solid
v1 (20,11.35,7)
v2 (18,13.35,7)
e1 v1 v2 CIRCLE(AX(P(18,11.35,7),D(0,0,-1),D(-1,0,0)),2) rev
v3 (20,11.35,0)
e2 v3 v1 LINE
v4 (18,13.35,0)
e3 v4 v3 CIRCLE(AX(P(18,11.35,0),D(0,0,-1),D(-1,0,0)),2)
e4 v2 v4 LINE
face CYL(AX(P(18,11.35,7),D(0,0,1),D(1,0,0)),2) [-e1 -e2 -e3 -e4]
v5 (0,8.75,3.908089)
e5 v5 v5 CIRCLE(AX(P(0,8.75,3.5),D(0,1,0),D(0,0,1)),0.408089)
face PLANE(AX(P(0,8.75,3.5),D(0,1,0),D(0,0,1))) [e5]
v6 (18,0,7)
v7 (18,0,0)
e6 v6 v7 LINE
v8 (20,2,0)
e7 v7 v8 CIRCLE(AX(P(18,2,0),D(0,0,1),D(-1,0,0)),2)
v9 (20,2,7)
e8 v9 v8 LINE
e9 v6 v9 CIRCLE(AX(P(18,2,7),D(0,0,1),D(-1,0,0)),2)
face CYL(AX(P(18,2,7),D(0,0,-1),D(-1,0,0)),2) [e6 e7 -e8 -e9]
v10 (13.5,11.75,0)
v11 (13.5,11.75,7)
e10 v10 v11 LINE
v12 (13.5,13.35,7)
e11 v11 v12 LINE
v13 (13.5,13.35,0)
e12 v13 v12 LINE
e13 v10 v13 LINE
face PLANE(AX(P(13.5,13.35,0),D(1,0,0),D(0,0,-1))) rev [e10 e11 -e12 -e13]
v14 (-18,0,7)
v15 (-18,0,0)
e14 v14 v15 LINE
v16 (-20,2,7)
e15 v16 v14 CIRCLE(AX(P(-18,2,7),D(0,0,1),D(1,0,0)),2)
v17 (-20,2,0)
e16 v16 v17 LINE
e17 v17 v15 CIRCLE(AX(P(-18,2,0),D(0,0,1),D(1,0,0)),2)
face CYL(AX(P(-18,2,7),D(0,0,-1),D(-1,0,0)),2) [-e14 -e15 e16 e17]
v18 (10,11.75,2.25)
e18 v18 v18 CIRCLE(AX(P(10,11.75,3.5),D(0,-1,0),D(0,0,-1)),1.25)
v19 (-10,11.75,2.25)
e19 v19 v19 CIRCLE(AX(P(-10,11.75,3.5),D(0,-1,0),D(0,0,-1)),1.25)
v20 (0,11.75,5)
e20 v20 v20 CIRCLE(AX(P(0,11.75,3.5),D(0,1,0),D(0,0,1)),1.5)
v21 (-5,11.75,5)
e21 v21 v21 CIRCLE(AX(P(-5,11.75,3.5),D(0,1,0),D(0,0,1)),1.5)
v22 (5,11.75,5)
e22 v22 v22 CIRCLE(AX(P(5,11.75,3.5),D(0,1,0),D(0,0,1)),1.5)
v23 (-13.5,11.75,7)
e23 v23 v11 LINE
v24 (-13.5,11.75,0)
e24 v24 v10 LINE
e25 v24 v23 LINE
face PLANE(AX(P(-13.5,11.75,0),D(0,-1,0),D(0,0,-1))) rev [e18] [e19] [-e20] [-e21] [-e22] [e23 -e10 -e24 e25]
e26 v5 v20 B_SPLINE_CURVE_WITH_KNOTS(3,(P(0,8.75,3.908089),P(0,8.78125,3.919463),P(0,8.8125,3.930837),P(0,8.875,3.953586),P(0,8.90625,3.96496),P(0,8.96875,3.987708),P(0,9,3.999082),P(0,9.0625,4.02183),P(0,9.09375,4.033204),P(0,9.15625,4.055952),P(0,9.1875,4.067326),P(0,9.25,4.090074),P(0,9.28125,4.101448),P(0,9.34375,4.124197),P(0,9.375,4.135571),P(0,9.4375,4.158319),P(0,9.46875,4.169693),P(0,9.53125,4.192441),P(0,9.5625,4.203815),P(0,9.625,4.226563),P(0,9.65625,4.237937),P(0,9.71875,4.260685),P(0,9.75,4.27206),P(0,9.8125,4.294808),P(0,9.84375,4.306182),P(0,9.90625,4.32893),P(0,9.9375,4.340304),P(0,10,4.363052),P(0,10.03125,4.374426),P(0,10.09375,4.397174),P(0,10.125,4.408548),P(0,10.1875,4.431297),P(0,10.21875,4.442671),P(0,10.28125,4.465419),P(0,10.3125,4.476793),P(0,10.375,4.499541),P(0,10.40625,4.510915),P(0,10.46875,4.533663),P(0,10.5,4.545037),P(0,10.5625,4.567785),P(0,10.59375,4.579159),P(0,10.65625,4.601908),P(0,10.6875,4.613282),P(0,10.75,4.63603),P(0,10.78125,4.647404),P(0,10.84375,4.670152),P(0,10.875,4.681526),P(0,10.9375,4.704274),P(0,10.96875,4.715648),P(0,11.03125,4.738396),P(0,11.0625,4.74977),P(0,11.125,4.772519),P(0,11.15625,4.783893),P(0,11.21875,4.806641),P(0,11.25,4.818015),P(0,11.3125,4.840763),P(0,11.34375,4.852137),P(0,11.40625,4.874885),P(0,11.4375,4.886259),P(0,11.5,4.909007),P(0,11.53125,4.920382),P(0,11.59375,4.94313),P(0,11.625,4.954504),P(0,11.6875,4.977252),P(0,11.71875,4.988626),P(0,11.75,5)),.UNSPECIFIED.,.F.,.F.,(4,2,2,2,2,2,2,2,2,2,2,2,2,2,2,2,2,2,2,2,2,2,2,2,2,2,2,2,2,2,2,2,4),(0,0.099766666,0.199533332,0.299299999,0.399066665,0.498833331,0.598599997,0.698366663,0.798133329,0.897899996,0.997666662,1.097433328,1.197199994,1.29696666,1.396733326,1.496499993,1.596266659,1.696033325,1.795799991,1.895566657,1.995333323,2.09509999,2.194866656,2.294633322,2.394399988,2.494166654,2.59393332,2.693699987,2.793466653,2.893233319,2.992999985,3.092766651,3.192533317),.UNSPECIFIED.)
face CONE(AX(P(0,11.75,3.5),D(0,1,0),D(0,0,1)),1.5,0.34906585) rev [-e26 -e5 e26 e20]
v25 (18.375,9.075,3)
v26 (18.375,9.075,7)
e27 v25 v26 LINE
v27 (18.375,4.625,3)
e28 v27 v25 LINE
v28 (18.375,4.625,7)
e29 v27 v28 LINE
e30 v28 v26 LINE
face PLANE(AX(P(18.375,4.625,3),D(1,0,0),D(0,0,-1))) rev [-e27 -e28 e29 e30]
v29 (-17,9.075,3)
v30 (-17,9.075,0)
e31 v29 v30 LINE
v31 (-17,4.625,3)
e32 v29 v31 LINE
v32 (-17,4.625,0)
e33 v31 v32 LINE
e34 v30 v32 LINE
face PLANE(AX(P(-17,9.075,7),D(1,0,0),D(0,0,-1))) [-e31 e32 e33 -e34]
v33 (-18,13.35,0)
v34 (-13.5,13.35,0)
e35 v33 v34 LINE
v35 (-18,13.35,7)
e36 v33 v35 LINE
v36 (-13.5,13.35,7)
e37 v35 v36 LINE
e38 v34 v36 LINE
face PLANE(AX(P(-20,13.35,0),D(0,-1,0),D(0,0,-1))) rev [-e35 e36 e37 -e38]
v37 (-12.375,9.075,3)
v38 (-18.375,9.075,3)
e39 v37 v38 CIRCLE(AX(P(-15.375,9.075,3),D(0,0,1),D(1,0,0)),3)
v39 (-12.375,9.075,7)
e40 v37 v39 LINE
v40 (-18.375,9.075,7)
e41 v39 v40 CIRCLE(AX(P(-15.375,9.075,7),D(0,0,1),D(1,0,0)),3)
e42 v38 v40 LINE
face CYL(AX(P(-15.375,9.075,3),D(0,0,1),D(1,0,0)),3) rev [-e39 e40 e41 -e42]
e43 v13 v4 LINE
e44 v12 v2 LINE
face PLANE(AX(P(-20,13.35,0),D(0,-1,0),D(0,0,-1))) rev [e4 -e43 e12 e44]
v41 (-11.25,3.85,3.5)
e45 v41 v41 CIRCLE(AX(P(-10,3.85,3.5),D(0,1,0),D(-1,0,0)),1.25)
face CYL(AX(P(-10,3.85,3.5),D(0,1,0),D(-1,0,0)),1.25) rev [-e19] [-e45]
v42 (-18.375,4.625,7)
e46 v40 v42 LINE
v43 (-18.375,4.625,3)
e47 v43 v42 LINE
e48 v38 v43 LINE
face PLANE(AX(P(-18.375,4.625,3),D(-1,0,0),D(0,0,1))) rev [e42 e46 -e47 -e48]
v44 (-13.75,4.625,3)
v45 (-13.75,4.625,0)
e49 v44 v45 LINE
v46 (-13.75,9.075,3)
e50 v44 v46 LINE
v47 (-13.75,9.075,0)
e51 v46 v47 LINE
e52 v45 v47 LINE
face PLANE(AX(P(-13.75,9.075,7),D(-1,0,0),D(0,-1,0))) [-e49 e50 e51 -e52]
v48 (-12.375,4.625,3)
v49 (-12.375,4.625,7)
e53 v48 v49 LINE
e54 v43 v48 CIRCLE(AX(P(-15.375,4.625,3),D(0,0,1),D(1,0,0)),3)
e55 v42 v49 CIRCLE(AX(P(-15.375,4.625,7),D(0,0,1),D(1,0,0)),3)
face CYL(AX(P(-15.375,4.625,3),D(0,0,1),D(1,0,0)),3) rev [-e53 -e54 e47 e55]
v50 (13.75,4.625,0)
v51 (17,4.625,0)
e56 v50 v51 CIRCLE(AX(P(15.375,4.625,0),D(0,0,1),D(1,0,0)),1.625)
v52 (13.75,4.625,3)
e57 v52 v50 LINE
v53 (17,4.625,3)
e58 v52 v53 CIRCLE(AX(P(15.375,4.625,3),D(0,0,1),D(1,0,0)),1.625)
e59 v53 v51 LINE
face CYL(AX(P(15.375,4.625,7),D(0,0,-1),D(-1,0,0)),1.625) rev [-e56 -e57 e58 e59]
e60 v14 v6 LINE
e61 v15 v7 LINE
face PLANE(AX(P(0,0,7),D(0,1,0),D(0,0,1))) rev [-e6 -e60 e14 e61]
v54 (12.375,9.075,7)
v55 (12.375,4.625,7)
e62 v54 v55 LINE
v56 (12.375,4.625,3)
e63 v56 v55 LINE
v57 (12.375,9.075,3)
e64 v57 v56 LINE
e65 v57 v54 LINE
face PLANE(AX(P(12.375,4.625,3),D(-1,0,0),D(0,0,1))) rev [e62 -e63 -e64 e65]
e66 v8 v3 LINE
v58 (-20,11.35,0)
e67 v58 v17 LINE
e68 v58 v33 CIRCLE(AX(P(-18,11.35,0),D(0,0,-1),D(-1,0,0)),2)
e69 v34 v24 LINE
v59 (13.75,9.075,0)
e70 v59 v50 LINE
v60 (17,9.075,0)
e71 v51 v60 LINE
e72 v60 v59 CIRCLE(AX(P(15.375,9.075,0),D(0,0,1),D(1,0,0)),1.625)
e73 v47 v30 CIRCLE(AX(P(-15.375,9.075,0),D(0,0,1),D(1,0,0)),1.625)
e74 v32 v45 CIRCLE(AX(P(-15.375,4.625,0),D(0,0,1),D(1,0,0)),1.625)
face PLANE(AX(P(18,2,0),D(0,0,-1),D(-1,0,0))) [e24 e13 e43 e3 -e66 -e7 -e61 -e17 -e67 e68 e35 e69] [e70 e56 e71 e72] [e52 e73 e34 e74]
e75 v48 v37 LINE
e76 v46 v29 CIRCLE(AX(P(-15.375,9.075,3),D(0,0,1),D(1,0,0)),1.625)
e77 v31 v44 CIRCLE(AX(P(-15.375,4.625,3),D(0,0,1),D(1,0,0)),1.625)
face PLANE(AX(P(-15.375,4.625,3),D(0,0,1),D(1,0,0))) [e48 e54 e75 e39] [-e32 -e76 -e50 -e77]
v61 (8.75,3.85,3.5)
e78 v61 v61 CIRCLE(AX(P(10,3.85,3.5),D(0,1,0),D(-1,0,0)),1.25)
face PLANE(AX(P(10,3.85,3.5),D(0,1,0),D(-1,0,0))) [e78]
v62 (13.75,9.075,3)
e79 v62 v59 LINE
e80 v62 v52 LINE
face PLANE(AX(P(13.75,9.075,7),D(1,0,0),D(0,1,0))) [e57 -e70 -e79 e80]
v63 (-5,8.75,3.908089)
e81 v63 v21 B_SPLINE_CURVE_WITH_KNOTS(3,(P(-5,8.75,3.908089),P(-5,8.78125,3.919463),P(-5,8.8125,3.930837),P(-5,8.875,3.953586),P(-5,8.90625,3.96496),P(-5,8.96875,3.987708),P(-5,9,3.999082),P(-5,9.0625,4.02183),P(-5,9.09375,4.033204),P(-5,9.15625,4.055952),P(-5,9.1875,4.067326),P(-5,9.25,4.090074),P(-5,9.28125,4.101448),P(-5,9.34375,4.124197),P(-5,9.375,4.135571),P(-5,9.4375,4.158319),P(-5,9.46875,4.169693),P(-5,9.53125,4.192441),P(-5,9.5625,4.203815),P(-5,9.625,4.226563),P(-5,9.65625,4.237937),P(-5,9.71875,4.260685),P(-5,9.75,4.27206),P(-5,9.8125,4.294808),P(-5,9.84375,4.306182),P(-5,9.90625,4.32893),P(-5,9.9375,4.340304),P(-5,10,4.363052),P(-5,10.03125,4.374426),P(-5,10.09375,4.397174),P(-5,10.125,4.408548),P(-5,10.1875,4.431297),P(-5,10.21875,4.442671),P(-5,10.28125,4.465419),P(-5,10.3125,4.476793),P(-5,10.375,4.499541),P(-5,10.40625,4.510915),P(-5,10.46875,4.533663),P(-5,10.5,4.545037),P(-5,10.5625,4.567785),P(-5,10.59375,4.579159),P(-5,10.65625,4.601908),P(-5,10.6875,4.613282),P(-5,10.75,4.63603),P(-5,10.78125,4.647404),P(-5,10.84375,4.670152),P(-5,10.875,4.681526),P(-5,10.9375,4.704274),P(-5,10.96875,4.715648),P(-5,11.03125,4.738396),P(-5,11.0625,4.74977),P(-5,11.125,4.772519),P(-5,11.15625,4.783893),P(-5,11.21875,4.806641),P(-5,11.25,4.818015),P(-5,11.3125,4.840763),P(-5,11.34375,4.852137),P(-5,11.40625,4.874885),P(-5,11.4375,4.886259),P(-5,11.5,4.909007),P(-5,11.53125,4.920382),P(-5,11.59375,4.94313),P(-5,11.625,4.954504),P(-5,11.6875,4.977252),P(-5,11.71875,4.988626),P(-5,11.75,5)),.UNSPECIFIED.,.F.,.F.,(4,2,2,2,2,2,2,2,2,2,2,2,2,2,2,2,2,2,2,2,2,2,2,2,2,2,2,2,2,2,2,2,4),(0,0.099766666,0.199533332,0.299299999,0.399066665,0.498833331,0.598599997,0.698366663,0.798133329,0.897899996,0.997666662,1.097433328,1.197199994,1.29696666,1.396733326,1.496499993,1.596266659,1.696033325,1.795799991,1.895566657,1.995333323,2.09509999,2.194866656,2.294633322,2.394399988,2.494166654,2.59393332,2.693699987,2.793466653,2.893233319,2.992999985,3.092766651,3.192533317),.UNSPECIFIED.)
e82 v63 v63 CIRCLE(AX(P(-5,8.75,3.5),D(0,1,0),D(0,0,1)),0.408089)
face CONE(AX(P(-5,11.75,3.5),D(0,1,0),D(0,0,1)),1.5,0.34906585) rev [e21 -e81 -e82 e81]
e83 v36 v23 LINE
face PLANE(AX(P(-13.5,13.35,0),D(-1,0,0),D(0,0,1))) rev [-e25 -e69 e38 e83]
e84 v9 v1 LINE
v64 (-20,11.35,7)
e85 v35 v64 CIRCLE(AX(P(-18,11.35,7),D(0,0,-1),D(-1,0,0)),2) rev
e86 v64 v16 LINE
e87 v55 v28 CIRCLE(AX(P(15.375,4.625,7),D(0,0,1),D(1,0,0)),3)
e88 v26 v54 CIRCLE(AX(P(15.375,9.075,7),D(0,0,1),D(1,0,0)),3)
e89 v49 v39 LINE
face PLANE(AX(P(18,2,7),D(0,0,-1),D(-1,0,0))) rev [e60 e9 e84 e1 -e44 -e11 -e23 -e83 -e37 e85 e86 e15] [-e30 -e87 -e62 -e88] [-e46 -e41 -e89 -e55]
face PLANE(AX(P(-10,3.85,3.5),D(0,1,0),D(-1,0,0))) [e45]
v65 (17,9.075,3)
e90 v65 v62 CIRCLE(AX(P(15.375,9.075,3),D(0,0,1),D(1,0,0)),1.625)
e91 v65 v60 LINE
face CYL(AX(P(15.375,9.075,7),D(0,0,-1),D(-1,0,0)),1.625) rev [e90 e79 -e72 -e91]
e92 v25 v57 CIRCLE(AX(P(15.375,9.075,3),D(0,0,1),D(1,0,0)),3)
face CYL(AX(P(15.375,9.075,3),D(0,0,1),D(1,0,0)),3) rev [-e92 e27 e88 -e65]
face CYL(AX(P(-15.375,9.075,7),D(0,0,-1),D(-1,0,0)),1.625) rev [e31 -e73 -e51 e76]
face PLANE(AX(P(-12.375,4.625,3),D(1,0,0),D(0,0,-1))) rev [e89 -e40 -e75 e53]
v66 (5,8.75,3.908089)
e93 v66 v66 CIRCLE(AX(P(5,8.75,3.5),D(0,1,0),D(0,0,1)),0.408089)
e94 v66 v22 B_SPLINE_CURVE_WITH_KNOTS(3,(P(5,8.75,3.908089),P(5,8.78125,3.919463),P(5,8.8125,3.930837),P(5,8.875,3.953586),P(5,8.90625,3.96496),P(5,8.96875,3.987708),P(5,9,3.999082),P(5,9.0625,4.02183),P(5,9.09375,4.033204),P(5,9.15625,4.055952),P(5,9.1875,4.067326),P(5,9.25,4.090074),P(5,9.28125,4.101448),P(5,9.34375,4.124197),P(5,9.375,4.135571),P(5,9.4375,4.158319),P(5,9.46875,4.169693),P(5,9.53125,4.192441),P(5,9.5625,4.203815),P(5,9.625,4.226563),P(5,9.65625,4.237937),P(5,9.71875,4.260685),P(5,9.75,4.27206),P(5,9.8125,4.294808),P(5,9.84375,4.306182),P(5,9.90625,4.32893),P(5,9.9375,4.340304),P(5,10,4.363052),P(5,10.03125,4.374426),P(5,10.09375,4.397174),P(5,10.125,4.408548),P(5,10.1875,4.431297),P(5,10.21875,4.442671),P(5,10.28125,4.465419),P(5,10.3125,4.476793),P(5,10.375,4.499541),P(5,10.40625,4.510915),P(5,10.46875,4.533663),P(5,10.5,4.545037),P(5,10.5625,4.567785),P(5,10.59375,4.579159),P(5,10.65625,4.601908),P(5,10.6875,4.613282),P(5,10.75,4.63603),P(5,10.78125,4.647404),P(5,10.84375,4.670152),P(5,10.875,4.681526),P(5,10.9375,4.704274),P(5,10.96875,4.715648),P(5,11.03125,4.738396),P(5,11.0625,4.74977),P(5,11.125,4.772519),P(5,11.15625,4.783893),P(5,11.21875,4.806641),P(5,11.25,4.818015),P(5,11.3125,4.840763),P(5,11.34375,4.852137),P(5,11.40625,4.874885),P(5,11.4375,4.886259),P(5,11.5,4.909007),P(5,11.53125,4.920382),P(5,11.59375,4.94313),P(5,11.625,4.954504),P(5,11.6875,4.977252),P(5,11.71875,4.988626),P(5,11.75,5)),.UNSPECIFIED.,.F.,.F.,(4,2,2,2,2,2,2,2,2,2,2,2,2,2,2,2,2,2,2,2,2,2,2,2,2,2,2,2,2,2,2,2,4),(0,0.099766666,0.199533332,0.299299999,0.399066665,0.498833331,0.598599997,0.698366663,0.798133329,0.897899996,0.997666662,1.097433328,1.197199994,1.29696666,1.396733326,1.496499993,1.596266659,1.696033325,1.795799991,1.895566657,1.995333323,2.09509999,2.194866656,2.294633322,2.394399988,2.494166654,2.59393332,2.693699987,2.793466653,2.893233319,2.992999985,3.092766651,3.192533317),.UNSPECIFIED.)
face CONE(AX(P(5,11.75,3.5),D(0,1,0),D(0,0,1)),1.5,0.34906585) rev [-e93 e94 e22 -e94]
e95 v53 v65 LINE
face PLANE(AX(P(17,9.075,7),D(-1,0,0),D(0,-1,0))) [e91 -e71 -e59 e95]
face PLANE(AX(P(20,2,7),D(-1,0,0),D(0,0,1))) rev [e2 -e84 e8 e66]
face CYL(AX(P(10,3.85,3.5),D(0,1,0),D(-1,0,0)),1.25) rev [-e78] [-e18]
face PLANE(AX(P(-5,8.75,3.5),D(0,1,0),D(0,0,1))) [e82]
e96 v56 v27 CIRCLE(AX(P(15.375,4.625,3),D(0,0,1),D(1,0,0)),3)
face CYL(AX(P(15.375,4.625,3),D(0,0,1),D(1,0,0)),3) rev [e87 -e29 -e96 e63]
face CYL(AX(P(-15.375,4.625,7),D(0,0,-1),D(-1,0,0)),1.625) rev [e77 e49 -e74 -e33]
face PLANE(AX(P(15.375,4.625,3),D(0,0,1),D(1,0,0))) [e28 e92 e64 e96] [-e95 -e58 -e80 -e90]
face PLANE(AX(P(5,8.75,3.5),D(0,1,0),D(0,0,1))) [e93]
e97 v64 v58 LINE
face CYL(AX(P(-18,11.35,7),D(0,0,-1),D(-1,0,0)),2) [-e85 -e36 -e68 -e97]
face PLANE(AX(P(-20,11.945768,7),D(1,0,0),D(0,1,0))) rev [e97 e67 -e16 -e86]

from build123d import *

# Parameters (mm, degrees)
BOSS_EXTRUDE1_DEPTH            = 7
SCREWHEADCLEARANCE_DEPTH       = 4
PCB_CUTOUT_DEPTH               = 30.03484975
SKETCH8_R                      = 1.25
SCREWTHREADS_DEPTH             = 16
SKETCH9_R                      = 3
CUT_EXTRUDE6_DEPTH             = 8.1
SKETCH10_W                     = 40
SKETCH10_H                     = 6.5
CUT_EXTRUDE7_DEPTH             = 30.034849842
FILLET1_R                      = 2
SKETCH11_R                     = 1.5
CLEARANCEHOLES_DEPTH           = 3
CLEARANCEHOLES_DRAFT           = -20
CLEARANCEHOLES_PROFILE_2_DEPTH = 3
CLEARANCEHOLES_PROFILE_2_DRAFT = -20
CLEARANCEHOLES_PROFILE_3_DEPTH = 3
CLEARANCEHOLES_PROFILE_3_DRAFT = -20


with BuildPart() as part:
    # Sketch1 → Boss-Extrude1 (new body)
    with BuildSketch(Plane.XY):
        with BuildLine():
            Line((0, 0), (18, 0))
            ThreePointArc((18, 0), (19.414213562, 0.585786438), (20, 2))
            Line((20, 2), (20, 11.945768163))
            ThreePointArc((20, 11.945768163), (19.769252649, 12.878369398), (19.130254936, 13.595775369))
            Line((19.130254936, 13.595775369), (10.510938386, 19.500007206))
            ThreePointArc((10.510938386, 19.500007206), (9.972285338, 19.760499203), (9.380683449, 19.85))
            Line((9.380683449, 19.85), (-9.380683449, 19.85))
            ThreePointArc((-9.380683449, 19.85), (-9.972285338, 19.760499203), (-10.510938386, 19.500007206))
            Line((-10.510938386, 19.500007206), (-19.130254936, 13.595775369))
            ThreePointArc((-19.130254936, 13.595775369), (-19.769252649, 12.878369398), (-20, 11.945768163))
            Line((-20, 11.945768163), (-20, 2))
            ThreePointArc((-20, 2), (-19.414213562, 0.585786438), (-18, 0))
            Line((-18, 0), (0, 0))
        make_face()
        with BuildLine():
            Line((-13.75, 9.075), (-13.75, 4.625))
            ThreePointArc((-13.75, 4.625), (-15.375, 3), (-17, 4.625))
            Line((-17, 4.625), (-17, 9.075))
            ThreePointArc((-17, 9.075), (-15.375, 10.7), (-13.75, 9.075))
        make_face(mode=Mode.SUBTRACT)
        with BuildLine():
            Line((17, 9.075), (17, 4.625))
            ThreePointArc((17, 4.625), (15.375, 3), (13.75, 4.625))
            Line((13.75, 4.625), (13.75, 9.075))
            ThreePointArc((13.75, 9.075), (15.375, 10.7), (17, 9.075))
        make_face(mode=Mode.SUBTRACT)
    extrude(amount=BOSS_EXTRUDE1_DEPTH)

    # Sketch2 → ScrewHeadClearance (cut)
    with BuildSketch(Plane.XY.offset(7)):
        with BuildLine():
            Line((-18.375, 4.625), (-18.375, 9.075))
            ThreePointArc((-18.375, 9.075), (-15.375, 12.075), (-12.375, 9.075))
            Line((-12.375, 9.075), (-12.375, 4.625))
            ThreePointArc((-12.375, 4.625), (-15.375, 1.625), (-18.375, 4.625))
        make_face()
        with BuildLine():
            Line((12.375, 4.625), (12.375, 9.075))
            ThreePointArc((12.375, 9.075), (15.375, 12.075), (18.375, 9.075))
            Line((18.375, 9.075), (18.375, 4.625))
            ThreePointArc((18.375, 4.625), (15.375, 1.625), (12.375, 4.625))
        make_face()
    extrude(amount=-SCREWHEADCLEARANCE_DEPTH, mode=Mode.SUBTRACT)

    # Sketch6 → PCB Cutout (cut, through all)
    with BuildSketch(Plane.XY.offset(7)):
        Polygon((-13.5, 13.35), (-6.5, 13.35), (-6.5, 19.85), (6.5, 19.85), (6.5, 13.35), (13.5, 13.35), (13.5, 11.75), (-13.5, 11.75), align=None)
    extrude(amount=-PCB_CUTOUT_DEPTH, mode=Mode.SUBTRACT)

    # Sketch8 → ScrewThreads (cut)
    with BuildSketch(Plane(origin=(0, 19.85, 0), x_dir=(1, 0, 0), z_dir=(0, 1, 0))):
        with Locations(Location((-10, -3.5, 0), (0, 0, 180))):
            Circle(SKETCH8_R)
        with Locations(Location((10, -3.5, 0), (0, 0, 180))):
            Circle(SKETCH8_R)
    extrude(amount=-SCREWTHREADS_DEPTH, mode=Mode.SUBTRACT)

    # Sketch9 → Cut-Extrude6 (cut)
    with BuildSketch(Plane(origin=(0, 19.85, 0), x_dir=(1, 0, 0), z_dir=(0, 1, 0))):
        with Locations(Location((10, -3.5, 0), (0, 0, 101.913740948))):
            Circle(SKETCH9_R)
        with Locations(Location((-10, -3.5, 0), (0, 0, 99.806006121))):
            Circle(SKETCH9_R)
    extrude(amount=-CUT_EXTRUDE6_DEPTH, mode=Mode.SUBTRACT)

    # Sketch10 → Cut-Extrude7 (cut, through all)
    with BuildSketch(Plane.XY.offset(7)):
        with Locations((0, 16.6)):
            Rectangle(SKETCH10_W, SKETCH10_H)
    extrude(amount=-CUT_EXTRUDE7_DEPTH, mode=Mode.SUBTRACT)

    # Fillet1
    # the kernel refuses this fillet: 2 mm, written as the material it takes off along each edge
    with BuildSketch(Plane(origin=(-19.424125327, 13.35, 12.203143064), x_dir=(-0.27669557885699486, -0.9609576247894558, 0), z_dir=(0, 0, -1))) as fillet1_piece_1:
        with BuildLine():
            CenterArc((1.527866068, -1.92191525), FILLET1_R, 73.936914891, 90)
            Line((-0.394049182, -1.368524092), (-0.586240707, -1.313184976))
            Line((-0.586240707, -1.313184976), (-0.192191525, 0.055339116))
            Line((-0.192191525, 0.055339116), (-0.095535811, 0.175706883))
            ThreePointArc((-0.095535811, 0.175706883), (1.564088383, 0.357037942), (2.136596341, 0.192191525))
            Line((2.136596341, 0.192191525), (2.081257226, 0))
        make_face()
    extrude(amount=17.406286128, mode=Mode.SUBTRACT)
    with BuildSketch(Plane(origin=(19.424125327, 13.35, 12.203143064), x_dir=(-1, 0, 0), z_dir=(0, 0, -1))) as fillet1_piece_2:
        with BuildLine():
            CenterArc((1.424125327, -2), FILLET1_R, 90, 90)
            Line((-0.575874673, -2), (-0.775874673, -2))
            ThreePointArc((-0.775874673, -2), (-0.775874673, -1.404231837), (-0.142412533, 0.140423184))
            Line((-0.142412533, 0.140423184), (0, 0.2))
            Line((0, 0.2), (1.424125327, 0.2))
            Line((1.424125327, 0.2), (1.424125327, 0))
        make_face()
    extrude(amount=17.406286128, mode=Mode.SUBTRACT)


with BuildPart() as clearanceholes_tool:
    # Sketch11 → ClearanceHoles (with draft: the straight prism first)
    with BuildSketch(Plane(origin=(0, 11.75, 0), x_dir=(1, 0, 0), z_dir=(0, 1, 0))):
        with Locations((0, -3.5)):
            Circle(SKETCH11_R)
    extrude(amount=-CLEARANCEHOLES_DEPTH)
    # ClearanceHoles: the draft: its side faces are tilted about the plane it starts from
    clearanceholes_sides = [clearanceholes_tool.faces().sort_by_distance(p)[0] for p in [
        (-1.5, 10.25, 3.5),
    ]]
    draft(clearanceholes_sides, Plane(origin=(0, 11.75, 0), x_dir=(1, 0, 0), z_dir=(0, 1, 0)), CLEARANCEHOLES_DRAFT)


with BuildPart() as part_1:
    add(part.part)

    # ClearanceHoles: cut by clearanceholes_tool
    add(clearanceholes_tool.part, mode=Mode.SUBTRACT)


with BuildPart() as clearanceholes_profile_2_tool:
    # Sketch11 → ClearanceHoles profile 2 (with draft: the straight prism first)
    with BuildSketch(Plane(origin=(0, 11.75, 0), x_dir=(1, 0, 0), z_dir=(0, 1, 0))):
        with Locations((5, -3.5)):
            Circle(SKETCH11_R)
    extrude(amount=-CLEARANCEHOLES_PROFILE_2_DEPTH)
    # ClearanceHoles profile 2: the draft: its side faces are tilted about the plane it starts from
    clearanceholes_profile_2_sides = [clearanceholes_profile_2_tool.faces().sort_by_distance(p)[0] for p in [
        (3.5, 10.25, 3.5),
    ]]
    draft(clearanceholes_profile_2_sides, Plane(origin=(0, 11.75, 0), x_dir=(1, 0, 0), z_dir=(0, 1, 0)), CLEARANCEHOLES_PROFILE_2_DRAFT)


with BuildPart() as part_2:
    add(part_1.part)

    # ClearanceHoles profile 2: cut by clearanceholes_profile_2_tool
    add(clearanceholes_profile_2_tool.part, mode=Mode.SUBTRACT)


with BuildPart() as clearanceholes_profile_3_tool:
    # Sketch11 → ClearanceHoles profile 3 (with draft: the straight prism first)
    with BuildSketch(Plane(origin=(0, 11.75, 0), x_dir=(1, 0, 0), z_dir=(0, 1, 0))):
        with Locations((-5, -3.5)):
            Circle(SKETCH11_R)
    extrude(amount=-CLEARANCEHOLES_PROFILE_3_DEPTH)
    # ClearanceHoles profile 3: the draft: its side faces are tilted about the plane it starts from
    clearanceholes_profile_3_sides = [clearanceholes_profile_3_tool.faces().sort_by_distance(p)[0] for p in [
        (-6.5, 10.25, 3.5),
    ]]
    draft(clearanceholes_profile_3_sides, Plane(origin=(0, 11.75, 0), x_dir=(1, 0, 0), z_dir=(0, 1, 0)), CLEARANCEHOLES_PROFILE_3_DRAFT)


with BuildPart() as part_3:
    add(part_2.part)

    # ClearanceHoles profile 3: cut by clearanceholes_profile_3_tool
    add(clearanceholes_profile_3_tool.part, mode=Mode.SUBTRACT)


solid = part_3.part
